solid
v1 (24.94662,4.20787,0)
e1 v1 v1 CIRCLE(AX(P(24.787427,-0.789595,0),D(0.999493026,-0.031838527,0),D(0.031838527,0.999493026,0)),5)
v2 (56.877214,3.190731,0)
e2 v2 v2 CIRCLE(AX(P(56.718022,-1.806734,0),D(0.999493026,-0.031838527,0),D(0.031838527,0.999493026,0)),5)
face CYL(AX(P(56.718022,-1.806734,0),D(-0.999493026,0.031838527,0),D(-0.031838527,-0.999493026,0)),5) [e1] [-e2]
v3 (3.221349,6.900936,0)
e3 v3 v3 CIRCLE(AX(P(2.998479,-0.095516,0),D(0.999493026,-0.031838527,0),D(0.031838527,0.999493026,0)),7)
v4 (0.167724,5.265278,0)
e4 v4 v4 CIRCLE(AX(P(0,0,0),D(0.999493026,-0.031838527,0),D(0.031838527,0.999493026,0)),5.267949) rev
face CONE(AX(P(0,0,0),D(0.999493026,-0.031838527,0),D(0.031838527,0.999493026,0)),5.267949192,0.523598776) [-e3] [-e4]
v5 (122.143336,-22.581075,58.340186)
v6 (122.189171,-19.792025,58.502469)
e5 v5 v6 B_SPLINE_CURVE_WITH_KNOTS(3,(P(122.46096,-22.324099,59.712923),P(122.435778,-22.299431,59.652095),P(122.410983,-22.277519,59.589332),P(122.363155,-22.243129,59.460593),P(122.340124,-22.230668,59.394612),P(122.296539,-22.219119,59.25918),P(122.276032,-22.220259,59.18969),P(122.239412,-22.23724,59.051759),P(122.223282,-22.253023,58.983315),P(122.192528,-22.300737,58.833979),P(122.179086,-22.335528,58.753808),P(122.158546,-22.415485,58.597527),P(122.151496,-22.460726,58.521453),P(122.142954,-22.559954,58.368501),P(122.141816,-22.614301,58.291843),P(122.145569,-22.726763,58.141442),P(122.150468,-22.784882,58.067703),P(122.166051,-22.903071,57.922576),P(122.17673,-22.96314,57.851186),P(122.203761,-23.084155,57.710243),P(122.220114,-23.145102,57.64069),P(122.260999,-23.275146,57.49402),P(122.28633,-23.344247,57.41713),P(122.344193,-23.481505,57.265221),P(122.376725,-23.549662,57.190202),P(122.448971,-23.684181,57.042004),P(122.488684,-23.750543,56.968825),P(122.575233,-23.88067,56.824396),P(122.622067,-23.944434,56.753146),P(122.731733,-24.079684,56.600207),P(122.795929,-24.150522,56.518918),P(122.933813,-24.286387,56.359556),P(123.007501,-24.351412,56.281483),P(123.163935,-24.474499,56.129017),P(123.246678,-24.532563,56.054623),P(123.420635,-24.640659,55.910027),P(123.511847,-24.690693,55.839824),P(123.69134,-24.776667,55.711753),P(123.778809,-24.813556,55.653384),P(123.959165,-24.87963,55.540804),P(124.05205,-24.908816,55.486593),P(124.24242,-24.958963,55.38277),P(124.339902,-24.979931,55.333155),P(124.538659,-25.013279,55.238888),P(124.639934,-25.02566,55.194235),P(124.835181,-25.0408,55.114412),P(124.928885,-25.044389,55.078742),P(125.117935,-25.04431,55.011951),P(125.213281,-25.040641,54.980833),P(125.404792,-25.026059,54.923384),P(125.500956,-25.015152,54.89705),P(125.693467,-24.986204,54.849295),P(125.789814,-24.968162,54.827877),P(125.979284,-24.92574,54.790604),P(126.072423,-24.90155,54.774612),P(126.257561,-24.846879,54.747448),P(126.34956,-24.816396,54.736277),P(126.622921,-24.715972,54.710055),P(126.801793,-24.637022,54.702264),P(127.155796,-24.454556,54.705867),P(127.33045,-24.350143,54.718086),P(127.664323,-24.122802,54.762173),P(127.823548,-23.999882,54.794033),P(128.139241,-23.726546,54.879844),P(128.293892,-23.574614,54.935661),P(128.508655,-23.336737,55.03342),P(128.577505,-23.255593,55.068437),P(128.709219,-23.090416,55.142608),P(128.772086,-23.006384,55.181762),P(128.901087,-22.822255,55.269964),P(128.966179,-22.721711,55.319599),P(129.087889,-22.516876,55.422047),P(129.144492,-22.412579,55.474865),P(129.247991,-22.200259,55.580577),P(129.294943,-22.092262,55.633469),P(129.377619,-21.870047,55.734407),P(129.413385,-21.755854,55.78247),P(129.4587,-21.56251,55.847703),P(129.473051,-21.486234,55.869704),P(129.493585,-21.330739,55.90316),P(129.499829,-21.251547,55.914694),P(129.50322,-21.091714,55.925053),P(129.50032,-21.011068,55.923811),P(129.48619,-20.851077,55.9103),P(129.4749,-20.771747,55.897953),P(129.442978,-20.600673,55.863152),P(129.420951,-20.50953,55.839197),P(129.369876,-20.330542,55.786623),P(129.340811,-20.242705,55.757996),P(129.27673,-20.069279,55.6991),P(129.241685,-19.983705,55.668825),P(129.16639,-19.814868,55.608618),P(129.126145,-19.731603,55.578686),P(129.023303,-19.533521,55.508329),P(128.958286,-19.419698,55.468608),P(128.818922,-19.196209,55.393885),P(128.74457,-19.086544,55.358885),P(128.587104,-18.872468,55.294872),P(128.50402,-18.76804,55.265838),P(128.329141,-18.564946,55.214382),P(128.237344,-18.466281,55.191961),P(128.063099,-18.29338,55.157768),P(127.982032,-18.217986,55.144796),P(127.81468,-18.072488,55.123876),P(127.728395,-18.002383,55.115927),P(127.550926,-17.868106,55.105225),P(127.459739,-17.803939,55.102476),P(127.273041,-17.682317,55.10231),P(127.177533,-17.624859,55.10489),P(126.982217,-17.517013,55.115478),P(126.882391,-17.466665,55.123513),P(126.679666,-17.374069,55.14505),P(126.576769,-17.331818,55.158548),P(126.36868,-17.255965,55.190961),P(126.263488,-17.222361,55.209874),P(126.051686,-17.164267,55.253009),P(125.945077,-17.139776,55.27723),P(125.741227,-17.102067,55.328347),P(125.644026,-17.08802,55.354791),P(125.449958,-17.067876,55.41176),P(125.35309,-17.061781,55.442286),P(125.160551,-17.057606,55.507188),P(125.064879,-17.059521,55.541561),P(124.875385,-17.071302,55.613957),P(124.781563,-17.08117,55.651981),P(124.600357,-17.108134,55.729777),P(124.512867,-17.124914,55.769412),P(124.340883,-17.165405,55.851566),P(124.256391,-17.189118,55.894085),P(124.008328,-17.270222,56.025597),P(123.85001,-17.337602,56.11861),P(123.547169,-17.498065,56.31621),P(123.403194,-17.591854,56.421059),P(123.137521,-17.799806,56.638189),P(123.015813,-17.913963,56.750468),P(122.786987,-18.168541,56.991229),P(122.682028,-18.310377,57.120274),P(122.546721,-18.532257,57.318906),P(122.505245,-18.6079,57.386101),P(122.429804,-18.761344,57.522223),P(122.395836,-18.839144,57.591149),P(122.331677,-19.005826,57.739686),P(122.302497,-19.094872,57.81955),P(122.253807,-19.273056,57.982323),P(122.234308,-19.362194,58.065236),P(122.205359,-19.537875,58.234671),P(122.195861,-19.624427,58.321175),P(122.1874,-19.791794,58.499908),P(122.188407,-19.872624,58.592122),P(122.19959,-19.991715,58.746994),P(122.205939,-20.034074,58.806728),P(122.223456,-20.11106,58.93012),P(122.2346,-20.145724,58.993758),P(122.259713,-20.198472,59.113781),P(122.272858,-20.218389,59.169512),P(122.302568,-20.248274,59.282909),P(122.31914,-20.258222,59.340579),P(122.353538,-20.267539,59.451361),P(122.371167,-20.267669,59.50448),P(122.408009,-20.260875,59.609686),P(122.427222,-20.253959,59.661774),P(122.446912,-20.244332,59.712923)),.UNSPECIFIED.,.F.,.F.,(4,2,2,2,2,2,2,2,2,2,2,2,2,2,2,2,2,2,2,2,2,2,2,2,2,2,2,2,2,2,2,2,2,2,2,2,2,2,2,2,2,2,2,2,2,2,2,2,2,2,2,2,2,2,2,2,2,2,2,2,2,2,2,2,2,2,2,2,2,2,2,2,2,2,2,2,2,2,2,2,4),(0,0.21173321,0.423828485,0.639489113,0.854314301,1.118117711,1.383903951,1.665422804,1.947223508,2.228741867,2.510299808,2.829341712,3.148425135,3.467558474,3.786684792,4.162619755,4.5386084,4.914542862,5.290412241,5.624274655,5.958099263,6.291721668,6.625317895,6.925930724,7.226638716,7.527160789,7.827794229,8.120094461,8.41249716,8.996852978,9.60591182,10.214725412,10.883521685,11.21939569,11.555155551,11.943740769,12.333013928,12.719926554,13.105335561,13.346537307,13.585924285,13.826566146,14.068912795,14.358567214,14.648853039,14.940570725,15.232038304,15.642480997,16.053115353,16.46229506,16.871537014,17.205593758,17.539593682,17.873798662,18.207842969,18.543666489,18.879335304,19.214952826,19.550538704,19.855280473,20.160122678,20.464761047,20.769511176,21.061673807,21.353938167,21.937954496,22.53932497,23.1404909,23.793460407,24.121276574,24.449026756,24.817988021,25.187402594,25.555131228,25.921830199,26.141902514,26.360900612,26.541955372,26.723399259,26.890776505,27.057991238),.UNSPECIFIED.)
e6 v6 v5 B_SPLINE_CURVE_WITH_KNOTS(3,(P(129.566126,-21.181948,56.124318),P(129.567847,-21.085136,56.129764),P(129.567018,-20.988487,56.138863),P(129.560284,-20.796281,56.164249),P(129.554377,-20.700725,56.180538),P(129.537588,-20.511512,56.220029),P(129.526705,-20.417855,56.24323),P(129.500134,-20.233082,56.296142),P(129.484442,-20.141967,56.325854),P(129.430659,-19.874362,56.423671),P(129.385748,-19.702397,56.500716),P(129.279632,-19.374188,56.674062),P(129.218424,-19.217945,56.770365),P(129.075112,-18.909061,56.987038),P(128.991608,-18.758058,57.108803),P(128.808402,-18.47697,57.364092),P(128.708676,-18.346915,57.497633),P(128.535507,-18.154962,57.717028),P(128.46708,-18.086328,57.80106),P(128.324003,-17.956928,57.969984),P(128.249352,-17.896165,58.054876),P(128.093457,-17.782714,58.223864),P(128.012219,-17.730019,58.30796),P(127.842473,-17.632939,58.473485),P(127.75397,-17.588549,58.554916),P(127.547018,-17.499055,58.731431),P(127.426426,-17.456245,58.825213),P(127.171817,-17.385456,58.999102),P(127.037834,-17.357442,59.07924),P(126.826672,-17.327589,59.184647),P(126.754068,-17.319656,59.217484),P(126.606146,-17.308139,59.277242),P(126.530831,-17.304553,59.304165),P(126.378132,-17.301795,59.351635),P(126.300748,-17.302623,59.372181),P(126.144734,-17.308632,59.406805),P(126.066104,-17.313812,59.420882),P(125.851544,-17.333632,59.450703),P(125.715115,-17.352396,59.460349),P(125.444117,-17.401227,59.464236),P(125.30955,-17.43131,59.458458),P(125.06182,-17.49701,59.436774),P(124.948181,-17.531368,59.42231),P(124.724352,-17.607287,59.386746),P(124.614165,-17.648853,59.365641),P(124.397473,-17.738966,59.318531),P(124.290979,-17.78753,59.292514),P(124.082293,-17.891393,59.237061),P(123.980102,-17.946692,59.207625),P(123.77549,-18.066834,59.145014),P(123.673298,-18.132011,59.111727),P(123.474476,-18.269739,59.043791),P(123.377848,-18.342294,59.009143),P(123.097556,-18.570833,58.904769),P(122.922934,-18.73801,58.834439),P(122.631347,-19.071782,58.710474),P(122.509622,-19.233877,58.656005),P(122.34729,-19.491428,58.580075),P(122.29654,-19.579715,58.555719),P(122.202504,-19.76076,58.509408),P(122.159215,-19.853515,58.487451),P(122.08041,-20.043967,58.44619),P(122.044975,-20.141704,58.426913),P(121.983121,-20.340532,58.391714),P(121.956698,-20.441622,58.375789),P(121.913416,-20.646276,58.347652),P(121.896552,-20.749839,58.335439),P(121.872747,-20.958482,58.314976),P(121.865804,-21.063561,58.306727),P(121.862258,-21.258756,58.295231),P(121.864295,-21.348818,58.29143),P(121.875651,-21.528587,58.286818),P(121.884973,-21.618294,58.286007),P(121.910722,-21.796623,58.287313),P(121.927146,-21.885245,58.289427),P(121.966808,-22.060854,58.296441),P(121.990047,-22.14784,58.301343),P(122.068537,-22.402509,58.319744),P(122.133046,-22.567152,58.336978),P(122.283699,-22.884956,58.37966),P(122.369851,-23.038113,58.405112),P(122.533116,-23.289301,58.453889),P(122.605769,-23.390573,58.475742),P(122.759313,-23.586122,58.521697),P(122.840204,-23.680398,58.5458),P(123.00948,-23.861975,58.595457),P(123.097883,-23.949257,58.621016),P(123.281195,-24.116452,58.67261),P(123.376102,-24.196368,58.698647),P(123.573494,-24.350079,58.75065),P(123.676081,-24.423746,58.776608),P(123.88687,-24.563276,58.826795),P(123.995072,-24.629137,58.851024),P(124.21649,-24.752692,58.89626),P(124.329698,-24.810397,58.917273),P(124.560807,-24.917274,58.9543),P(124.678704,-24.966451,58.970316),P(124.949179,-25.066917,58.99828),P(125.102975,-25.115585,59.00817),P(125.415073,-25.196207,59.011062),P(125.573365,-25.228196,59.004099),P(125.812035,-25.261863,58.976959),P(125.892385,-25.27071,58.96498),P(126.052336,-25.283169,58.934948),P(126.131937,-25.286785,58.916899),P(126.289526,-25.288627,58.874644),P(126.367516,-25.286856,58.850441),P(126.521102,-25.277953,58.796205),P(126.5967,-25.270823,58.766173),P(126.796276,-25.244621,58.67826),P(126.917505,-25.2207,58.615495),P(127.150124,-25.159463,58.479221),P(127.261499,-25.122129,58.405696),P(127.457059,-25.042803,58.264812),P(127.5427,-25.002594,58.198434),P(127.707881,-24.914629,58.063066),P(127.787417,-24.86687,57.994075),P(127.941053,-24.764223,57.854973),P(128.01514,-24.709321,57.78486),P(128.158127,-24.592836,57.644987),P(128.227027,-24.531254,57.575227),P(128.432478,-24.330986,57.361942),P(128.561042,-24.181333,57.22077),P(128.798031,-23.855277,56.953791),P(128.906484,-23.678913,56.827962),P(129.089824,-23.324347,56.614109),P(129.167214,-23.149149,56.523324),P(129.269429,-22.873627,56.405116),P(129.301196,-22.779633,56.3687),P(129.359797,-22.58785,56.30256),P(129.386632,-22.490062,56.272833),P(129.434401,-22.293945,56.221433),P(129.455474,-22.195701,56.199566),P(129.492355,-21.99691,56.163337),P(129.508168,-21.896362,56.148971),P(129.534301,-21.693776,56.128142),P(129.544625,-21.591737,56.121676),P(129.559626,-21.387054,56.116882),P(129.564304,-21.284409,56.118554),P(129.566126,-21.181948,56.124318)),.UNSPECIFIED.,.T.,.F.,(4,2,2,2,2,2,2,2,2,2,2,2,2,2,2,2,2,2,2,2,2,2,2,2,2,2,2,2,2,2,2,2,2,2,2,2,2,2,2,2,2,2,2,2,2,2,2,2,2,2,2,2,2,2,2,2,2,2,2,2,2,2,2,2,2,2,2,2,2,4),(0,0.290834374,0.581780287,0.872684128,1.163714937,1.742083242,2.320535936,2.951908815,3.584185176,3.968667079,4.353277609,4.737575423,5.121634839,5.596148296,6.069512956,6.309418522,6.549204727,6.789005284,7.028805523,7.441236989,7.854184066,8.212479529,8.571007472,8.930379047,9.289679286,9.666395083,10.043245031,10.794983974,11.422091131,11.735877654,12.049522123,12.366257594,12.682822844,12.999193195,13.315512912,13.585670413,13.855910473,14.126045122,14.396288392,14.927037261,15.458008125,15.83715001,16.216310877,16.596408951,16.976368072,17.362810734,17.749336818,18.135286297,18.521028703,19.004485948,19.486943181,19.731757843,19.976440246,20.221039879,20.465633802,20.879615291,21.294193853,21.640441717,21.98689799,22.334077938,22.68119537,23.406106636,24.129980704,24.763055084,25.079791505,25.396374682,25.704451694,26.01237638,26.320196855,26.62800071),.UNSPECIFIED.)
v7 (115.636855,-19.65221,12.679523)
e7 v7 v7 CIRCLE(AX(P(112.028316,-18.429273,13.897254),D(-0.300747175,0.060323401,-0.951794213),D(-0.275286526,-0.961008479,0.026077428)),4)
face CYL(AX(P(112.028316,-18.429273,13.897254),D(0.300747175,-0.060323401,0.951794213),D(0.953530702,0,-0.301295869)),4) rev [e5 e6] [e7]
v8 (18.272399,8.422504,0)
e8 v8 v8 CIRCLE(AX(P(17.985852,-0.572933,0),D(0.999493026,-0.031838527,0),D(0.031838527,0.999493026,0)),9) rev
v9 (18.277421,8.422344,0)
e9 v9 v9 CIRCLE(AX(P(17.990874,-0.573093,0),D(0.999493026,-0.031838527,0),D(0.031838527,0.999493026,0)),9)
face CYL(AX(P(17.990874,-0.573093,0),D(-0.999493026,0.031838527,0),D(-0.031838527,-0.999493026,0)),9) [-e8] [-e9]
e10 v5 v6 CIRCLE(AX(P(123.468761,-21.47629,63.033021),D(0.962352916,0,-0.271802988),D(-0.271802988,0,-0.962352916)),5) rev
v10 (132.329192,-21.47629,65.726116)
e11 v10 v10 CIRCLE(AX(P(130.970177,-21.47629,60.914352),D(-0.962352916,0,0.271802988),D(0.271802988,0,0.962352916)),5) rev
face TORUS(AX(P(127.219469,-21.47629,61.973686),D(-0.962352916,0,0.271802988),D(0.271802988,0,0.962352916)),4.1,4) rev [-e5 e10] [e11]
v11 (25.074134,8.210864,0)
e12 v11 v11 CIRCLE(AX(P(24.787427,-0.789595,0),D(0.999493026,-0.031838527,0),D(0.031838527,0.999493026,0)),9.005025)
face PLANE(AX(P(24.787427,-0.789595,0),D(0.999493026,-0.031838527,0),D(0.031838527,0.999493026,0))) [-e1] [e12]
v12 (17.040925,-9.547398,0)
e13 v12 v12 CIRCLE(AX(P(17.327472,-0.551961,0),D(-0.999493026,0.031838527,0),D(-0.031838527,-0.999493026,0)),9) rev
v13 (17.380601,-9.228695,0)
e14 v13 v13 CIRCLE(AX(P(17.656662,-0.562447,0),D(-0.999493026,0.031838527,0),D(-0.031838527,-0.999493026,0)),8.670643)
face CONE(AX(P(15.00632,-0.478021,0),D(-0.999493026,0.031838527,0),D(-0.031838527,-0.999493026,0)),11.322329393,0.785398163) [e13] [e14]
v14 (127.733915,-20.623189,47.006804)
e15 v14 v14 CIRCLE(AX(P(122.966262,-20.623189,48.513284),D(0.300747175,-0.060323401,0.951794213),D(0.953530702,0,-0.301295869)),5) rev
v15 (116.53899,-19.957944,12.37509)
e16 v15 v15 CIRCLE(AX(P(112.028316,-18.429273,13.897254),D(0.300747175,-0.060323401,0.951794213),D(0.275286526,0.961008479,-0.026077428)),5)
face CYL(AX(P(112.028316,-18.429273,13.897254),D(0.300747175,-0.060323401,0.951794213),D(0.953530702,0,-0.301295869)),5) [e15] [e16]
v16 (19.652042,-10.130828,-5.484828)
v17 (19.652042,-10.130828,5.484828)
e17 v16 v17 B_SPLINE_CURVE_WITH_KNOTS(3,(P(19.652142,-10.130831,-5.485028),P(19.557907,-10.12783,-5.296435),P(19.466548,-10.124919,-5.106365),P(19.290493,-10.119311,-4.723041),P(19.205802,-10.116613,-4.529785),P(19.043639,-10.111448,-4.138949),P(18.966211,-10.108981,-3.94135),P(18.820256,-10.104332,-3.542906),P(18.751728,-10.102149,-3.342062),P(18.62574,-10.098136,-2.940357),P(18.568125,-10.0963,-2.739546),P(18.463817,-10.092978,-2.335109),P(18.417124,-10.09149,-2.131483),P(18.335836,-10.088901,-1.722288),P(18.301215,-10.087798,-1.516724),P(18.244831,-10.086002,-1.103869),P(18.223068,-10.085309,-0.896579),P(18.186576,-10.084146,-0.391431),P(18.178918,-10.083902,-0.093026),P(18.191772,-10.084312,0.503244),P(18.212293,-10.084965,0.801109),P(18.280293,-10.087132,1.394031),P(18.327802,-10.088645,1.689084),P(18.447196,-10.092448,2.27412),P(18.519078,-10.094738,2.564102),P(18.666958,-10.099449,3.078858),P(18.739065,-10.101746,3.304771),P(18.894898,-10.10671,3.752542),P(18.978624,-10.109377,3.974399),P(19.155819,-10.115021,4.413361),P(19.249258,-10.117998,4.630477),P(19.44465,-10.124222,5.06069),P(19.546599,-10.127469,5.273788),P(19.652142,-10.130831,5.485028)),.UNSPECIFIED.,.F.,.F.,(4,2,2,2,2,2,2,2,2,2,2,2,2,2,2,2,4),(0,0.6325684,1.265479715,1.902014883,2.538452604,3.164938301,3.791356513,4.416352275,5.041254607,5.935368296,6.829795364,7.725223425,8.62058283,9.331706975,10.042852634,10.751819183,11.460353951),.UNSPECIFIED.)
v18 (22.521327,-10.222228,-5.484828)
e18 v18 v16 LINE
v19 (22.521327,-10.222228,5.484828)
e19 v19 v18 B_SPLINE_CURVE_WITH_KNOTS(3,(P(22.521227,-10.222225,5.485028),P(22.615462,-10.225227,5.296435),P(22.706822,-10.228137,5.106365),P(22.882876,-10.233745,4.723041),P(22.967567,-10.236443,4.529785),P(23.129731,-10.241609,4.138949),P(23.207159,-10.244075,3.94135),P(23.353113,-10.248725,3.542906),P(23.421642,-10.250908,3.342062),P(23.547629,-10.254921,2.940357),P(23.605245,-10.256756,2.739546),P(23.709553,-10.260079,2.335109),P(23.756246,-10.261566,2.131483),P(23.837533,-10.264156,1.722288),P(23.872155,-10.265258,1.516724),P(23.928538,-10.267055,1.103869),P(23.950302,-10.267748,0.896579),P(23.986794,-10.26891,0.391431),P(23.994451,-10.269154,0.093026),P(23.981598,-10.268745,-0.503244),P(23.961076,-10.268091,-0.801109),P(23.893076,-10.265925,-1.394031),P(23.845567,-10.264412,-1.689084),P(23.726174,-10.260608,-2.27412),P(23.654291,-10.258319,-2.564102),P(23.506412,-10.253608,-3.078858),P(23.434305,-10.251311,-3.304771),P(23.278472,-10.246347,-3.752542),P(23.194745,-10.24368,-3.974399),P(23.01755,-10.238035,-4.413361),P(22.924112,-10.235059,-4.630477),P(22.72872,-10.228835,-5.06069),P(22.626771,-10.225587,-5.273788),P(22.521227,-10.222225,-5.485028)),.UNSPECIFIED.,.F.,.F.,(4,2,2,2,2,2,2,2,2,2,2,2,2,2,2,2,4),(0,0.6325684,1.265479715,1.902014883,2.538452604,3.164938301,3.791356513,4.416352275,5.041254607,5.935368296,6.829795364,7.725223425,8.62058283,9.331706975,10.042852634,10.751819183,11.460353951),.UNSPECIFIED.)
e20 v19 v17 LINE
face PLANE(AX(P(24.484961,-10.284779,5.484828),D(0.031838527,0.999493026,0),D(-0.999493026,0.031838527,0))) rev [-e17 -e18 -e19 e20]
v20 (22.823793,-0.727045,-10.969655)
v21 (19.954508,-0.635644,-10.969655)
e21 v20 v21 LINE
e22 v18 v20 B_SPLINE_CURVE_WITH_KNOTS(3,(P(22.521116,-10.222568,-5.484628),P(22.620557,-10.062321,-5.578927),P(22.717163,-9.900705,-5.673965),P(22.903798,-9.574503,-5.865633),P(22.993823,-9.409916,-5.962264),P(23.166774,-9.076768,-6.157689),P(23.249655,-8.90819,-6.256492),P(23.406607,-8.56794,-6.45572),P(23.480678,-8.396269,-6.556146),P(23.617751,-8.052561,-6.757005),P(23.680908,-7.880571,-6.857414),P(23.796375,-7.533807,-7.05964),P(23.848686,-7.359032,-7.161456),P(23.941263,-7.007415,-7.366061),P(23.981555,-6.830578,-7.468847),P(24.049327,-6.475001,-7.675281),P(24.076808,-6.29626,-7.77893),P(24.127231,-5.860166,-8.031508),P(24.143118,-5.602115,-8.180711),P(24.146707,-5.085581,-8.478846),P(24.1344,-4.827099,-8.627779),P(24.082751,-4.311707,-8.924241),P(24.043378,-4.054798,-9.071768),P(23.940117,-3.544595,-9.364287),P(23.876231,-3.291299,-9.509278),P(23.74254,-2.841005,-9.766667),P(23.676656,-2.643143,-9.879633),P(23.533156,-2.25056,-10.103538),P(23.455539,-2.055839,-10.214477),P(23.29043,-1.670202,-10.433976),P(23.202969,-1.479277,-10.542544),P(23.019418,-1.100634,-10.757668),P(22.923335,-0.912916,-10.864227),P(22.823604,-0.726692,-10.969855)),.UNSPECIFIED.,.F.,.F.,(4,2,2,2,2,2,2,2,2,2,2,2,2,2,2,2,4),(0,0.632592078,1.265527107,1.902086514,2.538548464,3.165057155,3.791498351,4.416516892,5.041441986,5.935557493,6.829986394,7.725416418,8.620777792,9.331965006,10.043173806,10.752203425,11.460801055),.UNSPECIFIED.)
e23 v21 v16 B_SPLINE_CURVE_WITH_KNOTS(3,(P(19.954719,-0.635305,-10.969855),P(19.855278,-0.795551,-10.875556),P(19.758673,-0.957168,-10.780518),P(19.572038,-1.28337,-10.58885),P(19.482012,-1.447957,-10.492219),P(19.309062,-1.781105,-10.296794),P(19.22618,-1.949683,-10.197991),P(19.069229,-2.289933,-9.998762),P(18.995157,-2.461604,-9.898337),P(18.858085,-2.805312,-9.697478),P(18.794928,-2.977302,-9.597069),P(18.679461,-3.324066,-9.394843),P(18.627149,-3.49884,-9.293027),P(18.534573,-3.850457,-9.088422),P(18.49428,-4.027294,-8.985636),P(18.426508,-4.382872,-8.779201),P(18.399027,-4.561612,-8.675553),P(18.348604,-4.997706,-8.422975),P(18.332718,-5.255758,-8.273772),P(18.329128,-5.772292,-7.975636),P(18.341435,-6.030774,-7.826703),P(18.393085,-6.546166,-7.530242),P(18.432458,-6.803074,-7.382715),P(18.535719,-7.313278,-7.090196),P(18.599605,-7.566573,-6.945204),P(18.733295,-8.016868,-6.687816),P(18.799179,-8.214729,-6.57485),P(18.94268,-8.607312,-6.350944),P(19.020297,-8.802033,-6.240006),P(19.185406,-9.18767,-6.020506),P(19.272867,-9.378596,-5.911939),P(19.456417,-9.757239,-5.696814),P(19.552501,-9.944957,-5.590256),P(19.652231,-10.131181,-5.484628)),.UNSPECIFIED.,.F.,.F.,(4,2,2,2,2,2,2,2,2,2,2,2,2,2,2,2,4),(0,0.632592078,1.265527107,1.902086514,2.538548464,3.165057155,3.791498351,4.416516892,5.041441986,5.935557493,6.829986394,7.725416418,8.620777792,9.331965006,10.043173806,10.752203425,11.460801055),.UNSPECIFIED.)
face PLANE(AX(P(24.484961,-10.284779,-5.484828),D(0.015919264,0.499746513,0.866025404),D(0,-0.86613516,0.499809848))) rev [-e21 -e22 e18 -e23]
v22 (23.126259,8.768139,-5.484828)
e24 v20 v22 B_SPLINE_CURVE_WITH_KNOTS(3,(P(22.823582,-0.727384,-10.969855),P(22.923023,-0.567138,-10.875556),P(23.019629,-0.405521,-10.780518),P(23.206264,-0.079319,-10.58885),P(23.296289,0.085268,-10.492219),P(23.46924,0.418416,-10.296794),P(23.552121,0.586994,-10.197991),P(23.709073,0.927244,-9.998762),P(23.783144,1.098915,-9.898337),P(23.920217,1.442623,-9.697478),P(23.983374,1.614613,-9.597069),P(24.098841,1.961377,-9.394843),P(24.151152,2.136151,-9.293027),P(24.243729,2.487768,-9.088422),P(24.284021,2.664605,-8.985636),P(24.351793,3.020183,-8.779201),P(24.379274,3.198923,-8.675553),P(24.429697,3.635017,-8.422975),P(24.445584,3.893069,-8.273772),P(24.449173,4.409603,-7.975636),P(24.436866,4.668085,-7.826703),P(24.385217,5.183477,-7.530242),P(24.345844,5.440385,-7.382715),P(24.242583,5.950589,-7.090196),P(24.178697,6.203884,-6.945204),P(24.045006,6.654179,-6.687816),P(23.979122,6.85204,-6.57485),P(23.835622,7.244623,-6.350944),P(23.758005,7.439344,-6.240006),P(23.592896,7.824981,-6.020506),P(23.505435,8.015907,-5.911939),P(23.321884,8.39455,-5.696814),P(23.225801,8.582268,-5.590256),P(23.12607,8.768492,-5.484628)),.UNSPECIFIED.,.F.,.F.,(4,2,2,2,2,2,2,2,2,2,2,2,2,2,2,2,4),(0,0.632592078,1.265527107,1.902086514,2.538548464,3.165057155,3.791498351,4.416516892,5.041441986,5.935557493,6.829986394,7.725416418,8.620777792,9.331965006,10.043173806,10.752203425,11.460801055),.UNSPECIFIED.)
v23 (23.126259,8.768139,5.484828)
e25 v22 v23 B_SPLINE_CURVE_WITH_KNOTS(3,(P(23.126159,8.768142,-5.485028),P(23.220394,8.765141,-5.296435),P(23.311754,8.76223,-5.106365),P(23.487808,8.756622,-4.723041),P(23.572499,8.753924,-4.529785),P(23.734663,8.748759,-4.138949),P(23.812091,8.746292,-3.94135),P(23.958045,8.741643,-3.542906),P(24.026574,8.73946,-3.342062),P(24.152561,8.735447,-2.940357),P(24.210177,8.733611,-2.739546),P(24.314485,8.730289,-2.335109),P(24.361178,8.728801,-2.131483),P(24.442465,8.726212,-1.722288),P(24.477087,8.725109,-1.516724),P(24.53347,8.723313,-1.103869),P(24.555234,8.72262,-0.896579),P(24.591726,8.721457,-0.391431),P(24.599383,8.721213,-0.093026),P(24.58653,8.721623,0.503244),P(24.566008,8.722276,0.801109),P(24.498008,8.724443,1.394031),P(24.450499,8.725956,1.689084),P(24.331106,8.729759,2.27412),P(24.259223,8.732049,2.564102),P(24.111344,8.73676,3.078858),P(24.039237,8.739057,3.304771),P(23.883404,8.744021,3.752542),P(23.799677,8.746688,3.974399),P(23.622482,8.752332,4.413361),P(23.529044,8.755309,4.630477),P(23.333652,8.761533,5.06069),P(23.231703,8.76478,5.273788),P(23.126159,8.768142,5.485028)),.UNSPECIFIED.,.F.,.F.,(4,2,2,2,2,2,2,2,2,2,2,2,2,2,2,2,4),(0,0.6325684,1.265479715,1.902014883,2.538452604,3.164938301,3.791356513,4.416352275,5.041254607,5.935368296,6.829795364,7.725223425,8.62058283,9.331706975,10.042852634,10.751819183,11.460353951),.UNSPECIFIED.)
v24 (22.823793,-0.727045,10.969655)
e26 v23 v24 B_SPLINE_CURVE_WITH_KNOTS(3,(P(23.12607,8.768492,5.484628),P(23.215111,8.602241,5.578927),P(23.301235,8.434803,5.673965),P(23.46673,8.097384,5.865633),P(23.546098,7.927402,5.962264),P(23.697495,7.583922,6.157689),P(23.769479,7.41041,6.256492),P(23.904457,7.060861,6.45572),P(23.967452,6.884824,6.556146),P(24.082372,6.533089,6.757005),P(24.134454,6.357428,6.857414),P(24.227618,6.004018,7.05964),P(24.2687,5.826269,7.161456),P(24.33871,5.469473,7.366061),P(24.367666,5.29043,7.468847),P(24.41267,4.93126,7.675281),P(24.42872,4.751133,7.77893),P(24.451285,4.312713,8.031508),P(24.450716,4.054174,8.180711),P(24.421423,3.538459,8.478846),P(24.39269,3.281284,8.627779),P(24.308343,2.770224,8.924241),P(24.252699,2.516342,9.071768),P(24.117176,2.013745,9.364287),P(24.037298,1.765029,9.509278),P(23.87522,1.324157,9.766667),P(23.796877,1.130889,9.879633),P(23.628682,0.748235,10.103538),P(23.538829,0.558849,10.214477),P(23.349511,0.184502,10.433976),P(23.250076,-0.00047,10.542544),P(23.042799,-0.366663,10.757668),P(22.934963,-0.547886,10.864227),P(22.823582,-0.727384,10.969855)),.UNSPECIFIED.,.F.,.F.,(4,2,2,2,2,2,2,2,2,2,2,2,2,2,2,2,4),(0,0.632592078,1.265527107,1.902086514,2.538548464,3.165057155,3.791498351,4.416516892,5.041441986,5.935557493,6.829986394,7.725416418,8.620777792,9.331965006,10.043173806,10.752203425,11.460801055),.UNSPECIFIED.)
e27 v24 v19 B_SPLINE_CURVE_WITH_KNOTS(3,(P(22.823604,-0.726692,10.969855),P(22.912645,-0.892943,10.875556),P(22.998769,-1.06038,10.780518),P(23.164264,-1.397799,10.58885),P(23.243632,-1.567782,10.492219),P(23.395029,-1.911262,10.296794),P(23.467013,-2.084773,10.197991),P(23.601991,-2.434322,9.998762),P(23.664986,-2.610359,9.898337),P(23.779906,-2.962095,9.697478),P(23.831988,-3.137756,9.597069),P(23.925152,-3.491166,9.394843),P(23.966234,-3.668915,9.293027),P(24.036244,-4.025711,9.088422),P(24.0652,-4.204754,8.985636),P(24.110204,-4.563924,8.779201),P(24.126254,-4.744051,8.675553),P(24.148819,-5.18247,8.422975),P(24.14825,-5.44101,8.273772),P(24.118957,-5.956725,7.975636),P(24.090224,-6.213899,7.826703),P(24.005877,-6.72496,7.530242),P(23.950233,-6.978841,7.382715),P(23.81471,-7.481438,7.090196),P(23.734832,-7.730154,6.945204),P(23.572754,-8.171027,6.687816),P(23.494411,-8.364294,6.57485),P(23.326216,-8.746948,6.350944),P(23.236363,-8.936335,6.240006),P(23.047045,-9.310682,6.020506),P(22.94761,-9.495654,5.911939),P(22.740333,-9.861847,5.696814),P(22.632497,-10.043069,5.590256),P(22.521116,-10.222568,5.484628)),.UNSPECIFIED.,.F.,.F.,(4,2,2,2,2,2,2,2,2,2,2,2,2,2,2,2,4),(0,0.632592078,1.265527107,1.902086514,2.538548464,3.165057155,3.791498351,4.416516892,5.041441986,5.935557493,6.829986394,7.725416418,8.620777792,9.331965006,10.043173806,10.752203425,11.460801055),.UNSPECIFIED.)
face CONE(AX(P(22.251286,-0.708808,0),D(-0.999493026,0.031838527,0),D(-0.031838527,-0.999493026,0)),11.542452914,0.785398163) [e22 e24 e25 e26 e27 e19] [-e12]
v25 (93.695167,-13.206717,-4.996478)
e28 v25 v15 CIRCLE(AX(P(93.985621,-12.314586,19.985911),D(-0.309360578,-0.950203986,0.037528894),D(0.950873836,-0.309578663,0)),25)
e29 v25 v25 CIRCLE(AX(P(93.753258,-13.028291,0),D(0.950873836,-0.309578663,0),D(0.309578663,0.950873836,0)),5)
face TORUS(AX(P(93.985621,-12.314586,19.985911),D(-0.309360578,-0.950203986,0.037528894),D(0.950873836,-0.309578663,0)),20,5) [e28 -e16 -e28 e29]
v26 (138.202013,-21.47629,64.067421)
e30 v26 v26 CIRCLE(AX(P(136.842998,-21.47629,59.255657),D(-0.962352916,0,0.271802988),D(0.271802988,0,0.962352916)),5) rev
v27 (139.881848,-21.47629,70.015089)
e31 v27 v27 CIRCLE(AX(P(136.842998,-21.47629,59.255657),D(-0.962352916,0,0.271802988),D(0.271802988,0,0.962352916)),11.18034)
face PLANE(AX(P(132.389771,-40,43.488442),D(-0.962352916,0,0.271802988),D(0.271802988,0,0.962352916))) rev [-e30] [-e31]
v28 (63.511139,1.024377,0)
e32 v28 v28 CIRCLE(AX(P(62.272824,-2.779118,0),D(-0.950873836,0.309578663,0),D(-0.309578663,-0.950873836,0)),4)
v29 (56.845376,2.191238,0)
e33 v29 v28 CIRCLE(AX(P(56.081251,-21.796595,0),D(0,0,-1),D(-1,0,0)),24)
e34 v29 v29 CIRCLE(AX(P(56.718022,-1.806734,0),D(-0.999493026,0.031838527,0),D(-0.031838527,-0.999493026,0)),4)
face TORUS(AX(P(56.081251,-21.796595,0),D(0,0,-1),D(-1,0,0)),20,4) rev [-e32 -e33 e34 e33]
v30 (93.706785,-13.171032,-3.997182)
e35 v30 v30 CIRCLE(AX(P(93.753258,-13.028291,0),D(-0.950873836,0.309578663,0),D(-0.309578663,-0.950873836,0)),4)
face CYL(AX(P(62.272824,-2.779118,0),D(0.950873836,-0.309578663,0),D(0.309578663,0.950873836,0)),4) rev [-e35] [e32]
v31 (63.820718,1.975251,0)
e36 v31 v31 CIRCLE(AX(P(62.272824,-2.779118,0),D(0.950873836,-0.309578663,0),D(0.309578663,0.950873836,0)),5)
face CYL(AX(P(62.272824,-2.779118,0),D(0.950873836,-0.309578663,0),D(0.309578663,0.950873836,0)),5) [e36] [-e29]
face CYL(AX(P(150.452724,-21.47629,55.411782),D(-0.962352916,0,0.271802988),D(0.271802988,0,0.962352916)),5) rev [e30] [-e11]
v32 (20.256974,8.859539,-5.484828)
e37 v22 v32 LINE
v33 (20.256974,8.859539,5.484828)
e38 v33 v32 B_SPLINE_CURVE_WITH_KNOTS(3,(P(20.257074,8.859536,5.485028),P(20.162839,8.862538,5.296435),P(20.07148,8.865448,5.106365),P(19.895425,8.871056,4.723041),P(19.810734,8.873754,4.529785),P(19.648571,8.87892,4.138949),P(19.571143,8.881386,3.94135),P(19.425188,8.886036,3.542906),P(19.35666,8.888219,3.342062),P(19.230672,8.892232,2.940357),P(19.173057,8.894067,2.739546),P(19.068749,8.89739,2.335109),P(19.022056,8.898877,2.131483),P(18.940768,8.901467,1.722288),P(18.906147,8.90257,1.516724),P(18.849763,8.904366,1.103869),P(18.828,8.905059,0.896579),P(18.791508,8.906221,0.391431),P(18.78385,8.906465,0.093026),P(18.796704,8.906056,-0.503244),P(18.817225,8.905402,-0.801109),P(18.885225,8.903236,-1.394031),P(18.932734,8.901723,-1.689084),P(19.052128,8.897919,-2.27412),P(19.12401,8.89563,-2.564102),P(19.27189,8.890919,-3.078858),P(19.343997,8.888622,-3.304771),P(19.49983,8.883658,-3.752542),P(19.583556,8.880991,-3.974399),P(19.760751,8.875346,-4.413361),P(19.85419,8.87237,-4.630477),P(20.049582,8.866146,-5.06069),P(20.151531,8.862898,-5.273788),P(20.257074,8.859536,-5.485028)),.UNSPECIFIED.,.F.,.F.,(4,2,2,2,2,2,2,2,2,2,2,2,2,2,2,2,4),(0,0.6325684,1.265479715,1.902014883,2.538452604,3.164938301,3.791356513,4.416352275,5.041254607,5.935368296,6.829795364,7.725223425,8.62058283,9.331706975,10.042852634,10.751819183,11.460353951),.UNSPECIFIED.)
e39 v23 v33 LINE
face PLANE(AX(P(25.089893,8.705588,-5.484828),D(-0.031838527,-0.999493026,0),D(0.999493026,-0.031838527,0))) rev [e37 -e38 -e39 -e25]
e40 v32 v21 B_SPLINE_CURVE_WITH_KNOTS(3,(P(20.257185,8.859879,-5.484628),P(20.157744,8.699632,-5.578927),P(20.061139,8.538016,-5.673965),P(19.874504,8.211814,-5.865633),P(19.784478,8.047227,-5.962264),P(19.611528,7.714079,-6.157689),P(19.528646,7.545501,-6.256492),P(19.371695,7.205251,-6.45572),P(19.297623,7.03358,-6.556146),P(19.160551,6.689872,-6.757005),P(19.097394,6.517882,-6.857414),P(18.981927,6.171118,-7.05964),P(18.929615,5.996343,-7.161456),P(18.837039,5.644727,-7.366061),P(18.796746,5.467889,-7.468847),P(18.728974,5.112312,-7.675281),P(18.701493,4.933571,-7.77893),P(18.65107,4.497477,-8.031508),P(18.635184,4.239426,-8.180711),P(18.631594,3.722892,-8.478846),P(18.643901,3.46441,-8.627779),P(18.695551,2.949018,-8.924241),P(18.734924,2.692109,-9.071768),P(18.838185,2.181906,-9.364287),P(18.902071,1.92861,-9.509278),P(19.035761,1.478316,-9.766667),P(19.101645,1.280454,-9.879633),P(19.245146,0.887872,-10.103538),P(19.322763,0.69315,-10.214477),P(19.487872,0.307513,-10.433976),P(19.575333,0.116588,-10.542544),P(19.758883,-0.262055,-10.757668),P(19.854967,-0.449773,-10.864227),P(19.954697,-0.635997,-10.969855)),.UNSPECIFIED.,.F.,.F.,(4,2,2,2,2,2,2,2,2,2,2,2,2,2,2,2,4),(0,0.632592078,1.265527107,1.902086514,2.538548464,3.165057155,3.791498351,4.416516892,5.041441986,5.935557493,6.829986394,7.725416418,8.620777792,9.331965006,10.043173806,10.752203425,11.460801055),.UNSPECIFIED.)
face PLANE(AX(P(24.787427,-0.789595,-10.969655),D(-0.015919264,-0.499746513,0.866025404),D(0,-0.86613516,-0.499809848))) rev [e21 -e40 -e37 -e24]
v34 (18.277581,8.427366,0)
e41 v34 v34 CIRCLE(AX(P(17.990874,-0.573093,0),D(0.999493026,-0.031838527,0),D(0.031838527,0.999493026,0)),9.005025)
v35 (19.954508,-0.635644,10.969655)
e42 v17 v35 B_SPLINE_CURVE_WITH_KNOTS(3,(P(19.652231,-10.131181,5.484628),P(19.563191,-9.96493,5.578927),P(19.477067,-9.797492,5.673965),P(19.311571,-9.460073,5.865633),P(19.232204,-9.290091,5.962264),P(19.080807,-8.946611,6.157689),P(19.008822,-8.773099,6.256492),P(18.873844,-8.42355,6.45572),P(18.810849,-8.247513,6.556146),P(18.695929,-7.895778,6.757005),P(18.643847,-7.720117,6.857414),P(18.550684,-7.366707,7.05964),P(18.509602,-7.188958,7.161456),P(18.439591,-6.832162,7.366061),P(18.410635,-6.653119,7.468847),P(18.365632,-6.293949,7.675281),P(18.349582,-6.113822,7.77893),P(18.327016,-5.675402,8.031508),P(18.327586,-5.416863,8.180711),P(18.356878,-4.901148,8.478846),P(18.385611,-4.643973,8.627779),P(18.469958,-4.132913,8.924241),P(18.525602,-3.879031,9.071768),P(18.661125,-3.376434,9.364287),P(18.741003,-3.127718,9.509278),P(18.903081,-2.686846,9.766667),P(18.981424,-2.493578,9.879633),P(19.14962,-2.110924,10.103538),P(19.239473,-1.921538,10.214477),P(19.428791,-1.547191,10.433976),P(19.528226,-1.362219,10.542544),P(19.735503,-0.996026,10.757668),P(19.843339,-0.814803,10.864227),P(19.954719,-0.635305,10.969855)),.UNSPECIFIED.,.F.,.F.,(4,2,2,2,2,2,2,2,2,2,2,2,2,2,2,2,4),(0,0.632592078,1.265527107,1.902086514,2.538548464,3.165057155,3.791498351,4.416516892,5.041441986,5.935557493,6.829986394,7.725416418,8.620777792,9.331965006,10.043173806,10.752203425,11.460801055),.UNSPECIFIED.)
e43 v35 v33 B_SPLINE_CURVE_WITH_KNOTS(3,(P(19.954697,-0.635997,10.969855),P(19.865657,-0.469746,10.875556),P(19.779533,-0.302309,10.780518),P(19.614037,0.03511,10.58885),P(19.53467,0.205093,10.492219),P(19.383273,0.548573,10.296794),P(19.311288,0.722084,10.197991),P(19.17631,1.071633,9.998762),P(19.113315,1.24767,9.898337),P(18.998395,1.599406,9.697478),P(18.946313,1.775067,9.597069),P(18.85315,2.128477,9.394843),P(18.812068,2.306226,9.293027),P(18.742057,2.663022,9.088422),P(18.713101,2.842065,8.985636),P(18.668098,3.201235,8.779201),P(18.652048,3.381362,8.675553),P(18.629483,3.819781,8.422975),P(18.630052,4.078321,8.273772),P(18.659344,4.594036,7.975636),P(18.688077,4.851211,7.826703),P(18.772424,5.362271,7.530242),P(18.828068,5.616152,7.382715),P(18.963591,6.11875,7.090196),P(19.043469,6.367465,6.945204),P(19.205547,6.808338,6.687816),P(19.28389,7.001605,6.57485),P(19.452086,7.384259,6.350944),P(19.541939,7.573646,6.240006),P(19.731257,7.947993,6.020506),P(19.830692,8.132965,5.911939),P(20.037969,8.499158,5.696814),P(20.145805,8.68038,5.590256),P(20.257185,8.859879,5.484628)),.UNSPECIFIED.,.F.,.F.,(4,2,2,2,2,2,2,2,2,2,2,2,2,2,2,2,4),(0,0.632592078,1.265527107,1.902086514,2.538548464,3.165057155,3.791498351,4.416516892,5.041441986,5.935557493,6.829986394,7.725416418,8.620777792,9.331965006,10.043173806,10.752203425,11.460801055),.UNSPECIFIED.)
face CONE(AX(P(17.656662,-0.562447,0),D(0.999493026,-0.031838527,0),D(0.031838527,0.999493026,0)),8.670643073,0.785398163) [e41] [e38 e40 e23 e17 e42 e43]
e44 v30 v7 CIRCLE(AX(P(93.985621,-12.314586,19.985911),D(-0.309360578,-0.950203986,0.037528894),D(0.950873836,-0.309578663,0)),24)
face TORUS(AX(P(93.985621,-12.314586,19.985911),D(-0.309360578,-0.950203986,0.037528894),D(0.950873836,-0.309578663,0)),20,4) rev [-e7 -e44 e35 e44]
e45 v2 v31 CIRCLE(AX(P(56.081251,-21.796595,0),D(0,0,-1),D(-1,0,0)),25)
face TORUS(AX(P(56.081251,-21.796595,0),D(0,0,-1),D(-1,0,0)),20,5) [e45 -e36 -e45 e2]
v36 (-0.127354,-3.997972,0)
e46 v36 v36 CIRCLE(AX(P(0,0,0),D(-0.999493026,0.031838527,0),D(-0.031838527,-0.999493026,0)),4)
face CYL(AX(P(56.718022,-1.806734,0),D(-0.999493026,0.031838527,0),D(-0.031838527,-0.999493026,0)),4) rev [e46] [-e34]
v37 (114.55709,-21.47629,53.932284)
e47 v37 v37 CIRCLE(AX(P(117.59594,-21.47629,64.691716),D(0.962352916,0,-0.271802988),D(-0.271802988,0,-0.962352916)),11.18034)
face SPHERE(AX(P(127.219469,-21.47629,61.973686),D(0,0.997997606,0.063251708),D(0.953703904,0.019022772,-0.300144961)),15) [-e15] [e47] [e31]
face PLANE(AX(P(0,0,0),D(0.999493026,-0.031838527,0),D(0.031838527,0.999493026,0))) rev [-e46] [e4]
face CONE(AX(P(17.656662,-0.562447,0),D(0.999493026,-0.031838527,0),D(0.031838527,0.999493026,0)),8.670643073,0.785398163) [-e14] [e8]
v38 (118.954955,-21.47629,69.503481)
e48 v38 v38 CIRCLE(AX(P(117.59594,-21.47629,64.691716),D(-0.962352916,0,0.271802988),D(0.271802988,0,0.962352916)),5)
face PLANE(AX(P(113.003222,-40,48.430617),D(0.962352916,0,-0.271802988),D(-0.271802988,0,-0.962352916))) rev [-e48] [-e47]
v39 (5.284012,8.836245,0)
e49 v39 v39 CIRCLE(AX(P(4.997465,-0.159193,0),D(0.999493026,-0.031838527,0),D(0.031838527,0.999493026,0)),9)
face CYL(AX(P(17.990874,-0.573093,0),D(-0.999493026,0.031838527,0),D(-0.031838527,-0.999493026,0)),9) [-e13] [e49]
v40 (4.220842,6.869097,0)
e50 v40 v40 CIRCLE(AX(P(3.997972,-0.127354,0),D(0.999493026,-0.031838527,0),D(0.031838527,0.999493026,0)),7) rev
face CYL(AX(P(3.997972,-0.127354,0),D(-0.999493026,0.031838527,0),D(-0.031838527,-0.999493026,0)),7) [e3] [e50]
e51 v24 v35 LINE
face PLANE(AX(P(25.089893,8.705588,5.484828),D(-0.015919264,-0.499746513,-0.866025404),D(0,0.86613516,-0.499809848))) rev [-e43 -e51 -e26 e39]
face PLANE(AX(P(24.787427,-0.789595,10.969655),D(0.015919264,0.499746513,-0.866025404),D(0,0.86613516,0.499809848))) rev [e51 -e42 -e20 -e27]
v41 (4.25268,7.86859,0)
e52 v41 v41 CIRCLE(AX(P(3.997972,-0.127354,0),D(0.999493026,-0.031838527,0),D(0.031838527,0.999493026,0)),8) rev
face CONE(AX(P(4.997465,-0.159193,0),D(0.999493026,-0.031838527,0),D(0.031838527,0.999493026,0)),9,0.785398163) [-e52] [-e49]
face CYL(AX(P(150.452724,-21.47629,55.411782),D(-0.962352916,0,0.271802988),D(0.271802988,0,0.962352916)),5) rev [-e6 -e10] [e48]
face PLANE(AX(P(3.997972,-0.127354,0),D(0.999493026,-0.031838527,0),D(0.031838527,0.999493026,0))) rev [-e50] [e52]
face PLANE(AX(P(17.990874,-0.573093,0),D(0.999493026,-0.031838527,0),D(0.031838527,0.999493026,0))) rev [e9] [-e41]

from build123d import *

# Parameters (mm, degrees)
IZIM6_R                     = 5
IZIM7_R                     = 7
Y_KSEKLIK_EKSTR_ZYON4_DEPTH = 4
IZIM8_R                     = 9
Y_KSEKLIK_EKSTR_ZYON5_DEPTH = 14
Y_KSEKLIK_EKSTR_ZYON6_DEPTH = 6.8
PAH3_SIZE                   = 1
PAH4_SIZE                   = 3
PAH4_SIZE2                  = 1.732050808
KES_EKSTR_ZYON2_DEPTH       = 40
IZIM16_R                    = 5
KES_EKSTR_ZYON3_DEPTH       = 20
IZIM17_R                    = 4


# Read off the part's stored shape, not the designer's step: Kes-Döndür5
with BuildPart() as part:
    # Süpür2: sweep along a curve in space
    with BuildLine() as s_p_r2_path:
        Line((0, 0, 0), (56.718021516, -1.806734242, 0))
        ThreePointArc((62.272824235, -2.779118041, 0), (59.529866977, -2.096162077, 0), (56.718021516, -1.806734242, 0))
        Line((62.272824235, -2.779118041, 0), (93.753257718, -13.028291116, 0))
        ThreePointArc((112.028316303, -18.42927259, 13.897253926), (105.011429248, -16.541825325, 3.843978082), (93.753257718, -13.028291116, 0))
        Line((112.028316303, -18.42927259, 13.897253926), (127.219469031, -21.476290386, 61.973686406))
    # Çizim6 → Süpür2 (sweep)
    with BuildSketch(Plane(origin=(0, 0, 0), x_dir=(0, 0, -1), z_dir=(0.9994930255797312, -0.03183852725040804, 0))):
        Circle(IZIM6_R)
    sweep(path=s_p_r2_path.line)

    # Çizim7 → Yükseklik-Ekstrüzyon4 (add)
    with BuildSketch(Plane(origin=(0, 0, 0), x_dir=(0, 0, 1), z_dir=(-0.9994930255797312, 0.03183852725040805, 0))):
        with Locations(Location((0, 0, 0), (0, 0, 270))):
            Circle(IZIM7_R)
    extrude(amount=-Y_KSEKLIK_EKSTR_ZYON4_DEPTH)

    # Çizim8 → Yükseklik-Ekstrüzyon5 (add)
    with BuildSketch(Plane(origin=(3.997972102, -0.127354109, 0), x_dir=(0, 0, -1), z_dir=(0.9994930255797312, -0.031838527250408054, 0))):
        with Locations(Location((0, 0, 0), (0, 0, 90))):
            Circle(IZIM8_R)
    extrude(amount=Y_KSEKLIK_EKSTR_ZYON5_DEPTH)

    # Çizim9 → Yükseklik-Ekstrüzyon6 (add)
    with BuildSketch(Plane(origin=(17.99087446, -0.573093491, 0), x_dir=(0, 0, -1), z_dir=(0.9994930255797312, -0.03183852725040806, 0))):
        Polygon((10.969655115, 0), (5.484827557, 9.5), (-5.484827557, 9.5), (-10.969655115, 0), (-5.484827557, -9.5), (5.484827557, -9.5), align=None)
    extrude(amount=Y_KSEKLIK_EKSTR_ZYON6_DEPTH)

    # Pah3
    pah3_edges = [part.edges().sort_by_distance(p)[0] for p in [
        (3.711425357, -9.122791339, 0),
    ]]
    chamfer(pah3_edges, length=PAH3_SIZE)

    # Pah4
    pah4_edges = [part.edges().sort_by_distance(p)[0] for p in [
        (0.222869691, 6.996451179, 0),
    ]]
    pah4_side = [part.faces().sort_by_distance(p)[0] for p in [
        (2.221855742, 6.932774125, 0),
    ]]
    chamfer(pah4_edges, length=PAH4_SIZE, length2=PAH4_SIZE2, reference=pah4_side[0])

    # Çizim10 → Kes-Döndür2 (revolve, cut)
    with BuildSketch(Plane.XY):
        Polygon((22.618780487, 10.827793669), (25.852660243, 7.381106616), (28.637042918, 10.827793669), align=None)
        Polygon((20.847453028, 10.838567795), (17.932722309, 8.103800024), (15.366806113, 10.838567795), align=None)
    revolve(axis=Axis((17.99087446, -0.573093491, 0), (0.9994930255797312, -0.03183852725040806, 0)), mode=Mode.SUBTRACT)

    # Çizim14 → Döndür2 (revolve)
    with BuildSketch(Plane(origin=(29.636413051, -5.944425654, 93.792290583), x_dir=(0.9537039040924367, 0.019022772482439516, -0.30014496072052566), z_dir=(0.30074717508040627, -0.06032340080439443, 0.9517942130505669))):
        with BuildLine():
            Line((102.320076034, -2.513344877), (102.320076034, -32.513344877))
            ThreePointArc((102.320076034, -32.513344877), (117.320076034, -17.513344877), (102.320076034, -2.513344877))
        make_face()
    revolve(axis=Axis((127.219469031, -6.506326297, 62.922462025), (0, -0.9979976059302316, -0.06325170794157503)))

    # Çizim15 → Kes-Ekstrüzyon2 (cut)
    with BuildSketch(Plane(origin=(0, 0, 0), x_dir=(1, 0, 0), z_dir=(0, 1, 0))):
        Polygon((132.389771245, -43.488442314), (142.340651861, -78.720795845), (151.231048207, -76.209828969), (141.280167591, -40.977475439), align=None)
        Polygon((113.00322211, -48.430617202), (123.048070303, -83.99567484), (112.182017345, -87.064638021), (102.137169152, -51.499580383), align=None)
    extrude(amount=-KES_EKSTR_ZYON2_DEPTH, mode=Mode.SUBTRACT)

    # Çizim16 → Kes-Ekstrüzyon3 (cut)
    with BuildSketch(Plane(origin=(91.986882531, 0, -25.980395705), x_dir=(0.2718029884745819, 0, 0.9623529162715133), z_dir=(-0.9623529162715133, 0, 0.2718029884745819))):
        with Locations((94.21918972, -21.476290386)):
            Circle(IZIM16_R)
    extrude(amount=-KES_EKSTR_ZYON3_DEPTH, mode=Mode.SUBTRACT)

    # Kes-Süpür2: sweep along a curve in space
    with BuildLine() as kes_s_p_r2_path:
        Line((0, 0, 0), (56.718021516, -1.806734242, 0))
        ThreePointArc((62.272824235, -2.779118041, 0), (59.529866977, -2.096162077, 0), (56.718021516, -1.806734242, 0))
        Line((62.272824235, -2.779118041, 0), (93.753257718, -13.028291116, 0))
        ThreePointArc((112.028316303, -18.42927259, 13.897253926), (105.011429248, -16.541825325, 3.843978082), (93.753257718, -13.028291116, 0))
        Line((112.028316303, -18.42927259, 13.897253926), (127.219469031, -21.476290386, 61.973686406))
    # Çizim17 → Kes-Süpür2 (sweep, cut)
    with BuildSketch(Plane(origin=(0, 0, 0), x_dir=(0, 0, 1), z_dir=(-0.9994930255797312, 0.03183852725040805, 0))):
        Circle(IZIM17_R)
    sweep(path=kes_s_p_r2_path.line, mode=Mode.SUBTRACT)

    # Kes-Döndür5 outline → Kes-Döndür5 (revolve, cut)
    with BuildSketch(Plane(origin=(25.609057337, -21.476290386, 90.672111995), x_dir=(0, 1, 0), z_dir=(-0.2718029884745821, 0, -0.9623529162715133))):
        with BuildLine():
            ThreePointArc((5, 101.687958803), (8.1, 105.585393857), (5, 109.482828911))
            Line((5, 109.482828911), (5, 101.687958803))
        make_face()
    revolve(axis=Axis((25.609057337, -21.476290386, 90.672111995), (0.9623529162715133, 0, -0.2718029884745821)), mode=Mode.SUBTRACT)


solid = part.part
